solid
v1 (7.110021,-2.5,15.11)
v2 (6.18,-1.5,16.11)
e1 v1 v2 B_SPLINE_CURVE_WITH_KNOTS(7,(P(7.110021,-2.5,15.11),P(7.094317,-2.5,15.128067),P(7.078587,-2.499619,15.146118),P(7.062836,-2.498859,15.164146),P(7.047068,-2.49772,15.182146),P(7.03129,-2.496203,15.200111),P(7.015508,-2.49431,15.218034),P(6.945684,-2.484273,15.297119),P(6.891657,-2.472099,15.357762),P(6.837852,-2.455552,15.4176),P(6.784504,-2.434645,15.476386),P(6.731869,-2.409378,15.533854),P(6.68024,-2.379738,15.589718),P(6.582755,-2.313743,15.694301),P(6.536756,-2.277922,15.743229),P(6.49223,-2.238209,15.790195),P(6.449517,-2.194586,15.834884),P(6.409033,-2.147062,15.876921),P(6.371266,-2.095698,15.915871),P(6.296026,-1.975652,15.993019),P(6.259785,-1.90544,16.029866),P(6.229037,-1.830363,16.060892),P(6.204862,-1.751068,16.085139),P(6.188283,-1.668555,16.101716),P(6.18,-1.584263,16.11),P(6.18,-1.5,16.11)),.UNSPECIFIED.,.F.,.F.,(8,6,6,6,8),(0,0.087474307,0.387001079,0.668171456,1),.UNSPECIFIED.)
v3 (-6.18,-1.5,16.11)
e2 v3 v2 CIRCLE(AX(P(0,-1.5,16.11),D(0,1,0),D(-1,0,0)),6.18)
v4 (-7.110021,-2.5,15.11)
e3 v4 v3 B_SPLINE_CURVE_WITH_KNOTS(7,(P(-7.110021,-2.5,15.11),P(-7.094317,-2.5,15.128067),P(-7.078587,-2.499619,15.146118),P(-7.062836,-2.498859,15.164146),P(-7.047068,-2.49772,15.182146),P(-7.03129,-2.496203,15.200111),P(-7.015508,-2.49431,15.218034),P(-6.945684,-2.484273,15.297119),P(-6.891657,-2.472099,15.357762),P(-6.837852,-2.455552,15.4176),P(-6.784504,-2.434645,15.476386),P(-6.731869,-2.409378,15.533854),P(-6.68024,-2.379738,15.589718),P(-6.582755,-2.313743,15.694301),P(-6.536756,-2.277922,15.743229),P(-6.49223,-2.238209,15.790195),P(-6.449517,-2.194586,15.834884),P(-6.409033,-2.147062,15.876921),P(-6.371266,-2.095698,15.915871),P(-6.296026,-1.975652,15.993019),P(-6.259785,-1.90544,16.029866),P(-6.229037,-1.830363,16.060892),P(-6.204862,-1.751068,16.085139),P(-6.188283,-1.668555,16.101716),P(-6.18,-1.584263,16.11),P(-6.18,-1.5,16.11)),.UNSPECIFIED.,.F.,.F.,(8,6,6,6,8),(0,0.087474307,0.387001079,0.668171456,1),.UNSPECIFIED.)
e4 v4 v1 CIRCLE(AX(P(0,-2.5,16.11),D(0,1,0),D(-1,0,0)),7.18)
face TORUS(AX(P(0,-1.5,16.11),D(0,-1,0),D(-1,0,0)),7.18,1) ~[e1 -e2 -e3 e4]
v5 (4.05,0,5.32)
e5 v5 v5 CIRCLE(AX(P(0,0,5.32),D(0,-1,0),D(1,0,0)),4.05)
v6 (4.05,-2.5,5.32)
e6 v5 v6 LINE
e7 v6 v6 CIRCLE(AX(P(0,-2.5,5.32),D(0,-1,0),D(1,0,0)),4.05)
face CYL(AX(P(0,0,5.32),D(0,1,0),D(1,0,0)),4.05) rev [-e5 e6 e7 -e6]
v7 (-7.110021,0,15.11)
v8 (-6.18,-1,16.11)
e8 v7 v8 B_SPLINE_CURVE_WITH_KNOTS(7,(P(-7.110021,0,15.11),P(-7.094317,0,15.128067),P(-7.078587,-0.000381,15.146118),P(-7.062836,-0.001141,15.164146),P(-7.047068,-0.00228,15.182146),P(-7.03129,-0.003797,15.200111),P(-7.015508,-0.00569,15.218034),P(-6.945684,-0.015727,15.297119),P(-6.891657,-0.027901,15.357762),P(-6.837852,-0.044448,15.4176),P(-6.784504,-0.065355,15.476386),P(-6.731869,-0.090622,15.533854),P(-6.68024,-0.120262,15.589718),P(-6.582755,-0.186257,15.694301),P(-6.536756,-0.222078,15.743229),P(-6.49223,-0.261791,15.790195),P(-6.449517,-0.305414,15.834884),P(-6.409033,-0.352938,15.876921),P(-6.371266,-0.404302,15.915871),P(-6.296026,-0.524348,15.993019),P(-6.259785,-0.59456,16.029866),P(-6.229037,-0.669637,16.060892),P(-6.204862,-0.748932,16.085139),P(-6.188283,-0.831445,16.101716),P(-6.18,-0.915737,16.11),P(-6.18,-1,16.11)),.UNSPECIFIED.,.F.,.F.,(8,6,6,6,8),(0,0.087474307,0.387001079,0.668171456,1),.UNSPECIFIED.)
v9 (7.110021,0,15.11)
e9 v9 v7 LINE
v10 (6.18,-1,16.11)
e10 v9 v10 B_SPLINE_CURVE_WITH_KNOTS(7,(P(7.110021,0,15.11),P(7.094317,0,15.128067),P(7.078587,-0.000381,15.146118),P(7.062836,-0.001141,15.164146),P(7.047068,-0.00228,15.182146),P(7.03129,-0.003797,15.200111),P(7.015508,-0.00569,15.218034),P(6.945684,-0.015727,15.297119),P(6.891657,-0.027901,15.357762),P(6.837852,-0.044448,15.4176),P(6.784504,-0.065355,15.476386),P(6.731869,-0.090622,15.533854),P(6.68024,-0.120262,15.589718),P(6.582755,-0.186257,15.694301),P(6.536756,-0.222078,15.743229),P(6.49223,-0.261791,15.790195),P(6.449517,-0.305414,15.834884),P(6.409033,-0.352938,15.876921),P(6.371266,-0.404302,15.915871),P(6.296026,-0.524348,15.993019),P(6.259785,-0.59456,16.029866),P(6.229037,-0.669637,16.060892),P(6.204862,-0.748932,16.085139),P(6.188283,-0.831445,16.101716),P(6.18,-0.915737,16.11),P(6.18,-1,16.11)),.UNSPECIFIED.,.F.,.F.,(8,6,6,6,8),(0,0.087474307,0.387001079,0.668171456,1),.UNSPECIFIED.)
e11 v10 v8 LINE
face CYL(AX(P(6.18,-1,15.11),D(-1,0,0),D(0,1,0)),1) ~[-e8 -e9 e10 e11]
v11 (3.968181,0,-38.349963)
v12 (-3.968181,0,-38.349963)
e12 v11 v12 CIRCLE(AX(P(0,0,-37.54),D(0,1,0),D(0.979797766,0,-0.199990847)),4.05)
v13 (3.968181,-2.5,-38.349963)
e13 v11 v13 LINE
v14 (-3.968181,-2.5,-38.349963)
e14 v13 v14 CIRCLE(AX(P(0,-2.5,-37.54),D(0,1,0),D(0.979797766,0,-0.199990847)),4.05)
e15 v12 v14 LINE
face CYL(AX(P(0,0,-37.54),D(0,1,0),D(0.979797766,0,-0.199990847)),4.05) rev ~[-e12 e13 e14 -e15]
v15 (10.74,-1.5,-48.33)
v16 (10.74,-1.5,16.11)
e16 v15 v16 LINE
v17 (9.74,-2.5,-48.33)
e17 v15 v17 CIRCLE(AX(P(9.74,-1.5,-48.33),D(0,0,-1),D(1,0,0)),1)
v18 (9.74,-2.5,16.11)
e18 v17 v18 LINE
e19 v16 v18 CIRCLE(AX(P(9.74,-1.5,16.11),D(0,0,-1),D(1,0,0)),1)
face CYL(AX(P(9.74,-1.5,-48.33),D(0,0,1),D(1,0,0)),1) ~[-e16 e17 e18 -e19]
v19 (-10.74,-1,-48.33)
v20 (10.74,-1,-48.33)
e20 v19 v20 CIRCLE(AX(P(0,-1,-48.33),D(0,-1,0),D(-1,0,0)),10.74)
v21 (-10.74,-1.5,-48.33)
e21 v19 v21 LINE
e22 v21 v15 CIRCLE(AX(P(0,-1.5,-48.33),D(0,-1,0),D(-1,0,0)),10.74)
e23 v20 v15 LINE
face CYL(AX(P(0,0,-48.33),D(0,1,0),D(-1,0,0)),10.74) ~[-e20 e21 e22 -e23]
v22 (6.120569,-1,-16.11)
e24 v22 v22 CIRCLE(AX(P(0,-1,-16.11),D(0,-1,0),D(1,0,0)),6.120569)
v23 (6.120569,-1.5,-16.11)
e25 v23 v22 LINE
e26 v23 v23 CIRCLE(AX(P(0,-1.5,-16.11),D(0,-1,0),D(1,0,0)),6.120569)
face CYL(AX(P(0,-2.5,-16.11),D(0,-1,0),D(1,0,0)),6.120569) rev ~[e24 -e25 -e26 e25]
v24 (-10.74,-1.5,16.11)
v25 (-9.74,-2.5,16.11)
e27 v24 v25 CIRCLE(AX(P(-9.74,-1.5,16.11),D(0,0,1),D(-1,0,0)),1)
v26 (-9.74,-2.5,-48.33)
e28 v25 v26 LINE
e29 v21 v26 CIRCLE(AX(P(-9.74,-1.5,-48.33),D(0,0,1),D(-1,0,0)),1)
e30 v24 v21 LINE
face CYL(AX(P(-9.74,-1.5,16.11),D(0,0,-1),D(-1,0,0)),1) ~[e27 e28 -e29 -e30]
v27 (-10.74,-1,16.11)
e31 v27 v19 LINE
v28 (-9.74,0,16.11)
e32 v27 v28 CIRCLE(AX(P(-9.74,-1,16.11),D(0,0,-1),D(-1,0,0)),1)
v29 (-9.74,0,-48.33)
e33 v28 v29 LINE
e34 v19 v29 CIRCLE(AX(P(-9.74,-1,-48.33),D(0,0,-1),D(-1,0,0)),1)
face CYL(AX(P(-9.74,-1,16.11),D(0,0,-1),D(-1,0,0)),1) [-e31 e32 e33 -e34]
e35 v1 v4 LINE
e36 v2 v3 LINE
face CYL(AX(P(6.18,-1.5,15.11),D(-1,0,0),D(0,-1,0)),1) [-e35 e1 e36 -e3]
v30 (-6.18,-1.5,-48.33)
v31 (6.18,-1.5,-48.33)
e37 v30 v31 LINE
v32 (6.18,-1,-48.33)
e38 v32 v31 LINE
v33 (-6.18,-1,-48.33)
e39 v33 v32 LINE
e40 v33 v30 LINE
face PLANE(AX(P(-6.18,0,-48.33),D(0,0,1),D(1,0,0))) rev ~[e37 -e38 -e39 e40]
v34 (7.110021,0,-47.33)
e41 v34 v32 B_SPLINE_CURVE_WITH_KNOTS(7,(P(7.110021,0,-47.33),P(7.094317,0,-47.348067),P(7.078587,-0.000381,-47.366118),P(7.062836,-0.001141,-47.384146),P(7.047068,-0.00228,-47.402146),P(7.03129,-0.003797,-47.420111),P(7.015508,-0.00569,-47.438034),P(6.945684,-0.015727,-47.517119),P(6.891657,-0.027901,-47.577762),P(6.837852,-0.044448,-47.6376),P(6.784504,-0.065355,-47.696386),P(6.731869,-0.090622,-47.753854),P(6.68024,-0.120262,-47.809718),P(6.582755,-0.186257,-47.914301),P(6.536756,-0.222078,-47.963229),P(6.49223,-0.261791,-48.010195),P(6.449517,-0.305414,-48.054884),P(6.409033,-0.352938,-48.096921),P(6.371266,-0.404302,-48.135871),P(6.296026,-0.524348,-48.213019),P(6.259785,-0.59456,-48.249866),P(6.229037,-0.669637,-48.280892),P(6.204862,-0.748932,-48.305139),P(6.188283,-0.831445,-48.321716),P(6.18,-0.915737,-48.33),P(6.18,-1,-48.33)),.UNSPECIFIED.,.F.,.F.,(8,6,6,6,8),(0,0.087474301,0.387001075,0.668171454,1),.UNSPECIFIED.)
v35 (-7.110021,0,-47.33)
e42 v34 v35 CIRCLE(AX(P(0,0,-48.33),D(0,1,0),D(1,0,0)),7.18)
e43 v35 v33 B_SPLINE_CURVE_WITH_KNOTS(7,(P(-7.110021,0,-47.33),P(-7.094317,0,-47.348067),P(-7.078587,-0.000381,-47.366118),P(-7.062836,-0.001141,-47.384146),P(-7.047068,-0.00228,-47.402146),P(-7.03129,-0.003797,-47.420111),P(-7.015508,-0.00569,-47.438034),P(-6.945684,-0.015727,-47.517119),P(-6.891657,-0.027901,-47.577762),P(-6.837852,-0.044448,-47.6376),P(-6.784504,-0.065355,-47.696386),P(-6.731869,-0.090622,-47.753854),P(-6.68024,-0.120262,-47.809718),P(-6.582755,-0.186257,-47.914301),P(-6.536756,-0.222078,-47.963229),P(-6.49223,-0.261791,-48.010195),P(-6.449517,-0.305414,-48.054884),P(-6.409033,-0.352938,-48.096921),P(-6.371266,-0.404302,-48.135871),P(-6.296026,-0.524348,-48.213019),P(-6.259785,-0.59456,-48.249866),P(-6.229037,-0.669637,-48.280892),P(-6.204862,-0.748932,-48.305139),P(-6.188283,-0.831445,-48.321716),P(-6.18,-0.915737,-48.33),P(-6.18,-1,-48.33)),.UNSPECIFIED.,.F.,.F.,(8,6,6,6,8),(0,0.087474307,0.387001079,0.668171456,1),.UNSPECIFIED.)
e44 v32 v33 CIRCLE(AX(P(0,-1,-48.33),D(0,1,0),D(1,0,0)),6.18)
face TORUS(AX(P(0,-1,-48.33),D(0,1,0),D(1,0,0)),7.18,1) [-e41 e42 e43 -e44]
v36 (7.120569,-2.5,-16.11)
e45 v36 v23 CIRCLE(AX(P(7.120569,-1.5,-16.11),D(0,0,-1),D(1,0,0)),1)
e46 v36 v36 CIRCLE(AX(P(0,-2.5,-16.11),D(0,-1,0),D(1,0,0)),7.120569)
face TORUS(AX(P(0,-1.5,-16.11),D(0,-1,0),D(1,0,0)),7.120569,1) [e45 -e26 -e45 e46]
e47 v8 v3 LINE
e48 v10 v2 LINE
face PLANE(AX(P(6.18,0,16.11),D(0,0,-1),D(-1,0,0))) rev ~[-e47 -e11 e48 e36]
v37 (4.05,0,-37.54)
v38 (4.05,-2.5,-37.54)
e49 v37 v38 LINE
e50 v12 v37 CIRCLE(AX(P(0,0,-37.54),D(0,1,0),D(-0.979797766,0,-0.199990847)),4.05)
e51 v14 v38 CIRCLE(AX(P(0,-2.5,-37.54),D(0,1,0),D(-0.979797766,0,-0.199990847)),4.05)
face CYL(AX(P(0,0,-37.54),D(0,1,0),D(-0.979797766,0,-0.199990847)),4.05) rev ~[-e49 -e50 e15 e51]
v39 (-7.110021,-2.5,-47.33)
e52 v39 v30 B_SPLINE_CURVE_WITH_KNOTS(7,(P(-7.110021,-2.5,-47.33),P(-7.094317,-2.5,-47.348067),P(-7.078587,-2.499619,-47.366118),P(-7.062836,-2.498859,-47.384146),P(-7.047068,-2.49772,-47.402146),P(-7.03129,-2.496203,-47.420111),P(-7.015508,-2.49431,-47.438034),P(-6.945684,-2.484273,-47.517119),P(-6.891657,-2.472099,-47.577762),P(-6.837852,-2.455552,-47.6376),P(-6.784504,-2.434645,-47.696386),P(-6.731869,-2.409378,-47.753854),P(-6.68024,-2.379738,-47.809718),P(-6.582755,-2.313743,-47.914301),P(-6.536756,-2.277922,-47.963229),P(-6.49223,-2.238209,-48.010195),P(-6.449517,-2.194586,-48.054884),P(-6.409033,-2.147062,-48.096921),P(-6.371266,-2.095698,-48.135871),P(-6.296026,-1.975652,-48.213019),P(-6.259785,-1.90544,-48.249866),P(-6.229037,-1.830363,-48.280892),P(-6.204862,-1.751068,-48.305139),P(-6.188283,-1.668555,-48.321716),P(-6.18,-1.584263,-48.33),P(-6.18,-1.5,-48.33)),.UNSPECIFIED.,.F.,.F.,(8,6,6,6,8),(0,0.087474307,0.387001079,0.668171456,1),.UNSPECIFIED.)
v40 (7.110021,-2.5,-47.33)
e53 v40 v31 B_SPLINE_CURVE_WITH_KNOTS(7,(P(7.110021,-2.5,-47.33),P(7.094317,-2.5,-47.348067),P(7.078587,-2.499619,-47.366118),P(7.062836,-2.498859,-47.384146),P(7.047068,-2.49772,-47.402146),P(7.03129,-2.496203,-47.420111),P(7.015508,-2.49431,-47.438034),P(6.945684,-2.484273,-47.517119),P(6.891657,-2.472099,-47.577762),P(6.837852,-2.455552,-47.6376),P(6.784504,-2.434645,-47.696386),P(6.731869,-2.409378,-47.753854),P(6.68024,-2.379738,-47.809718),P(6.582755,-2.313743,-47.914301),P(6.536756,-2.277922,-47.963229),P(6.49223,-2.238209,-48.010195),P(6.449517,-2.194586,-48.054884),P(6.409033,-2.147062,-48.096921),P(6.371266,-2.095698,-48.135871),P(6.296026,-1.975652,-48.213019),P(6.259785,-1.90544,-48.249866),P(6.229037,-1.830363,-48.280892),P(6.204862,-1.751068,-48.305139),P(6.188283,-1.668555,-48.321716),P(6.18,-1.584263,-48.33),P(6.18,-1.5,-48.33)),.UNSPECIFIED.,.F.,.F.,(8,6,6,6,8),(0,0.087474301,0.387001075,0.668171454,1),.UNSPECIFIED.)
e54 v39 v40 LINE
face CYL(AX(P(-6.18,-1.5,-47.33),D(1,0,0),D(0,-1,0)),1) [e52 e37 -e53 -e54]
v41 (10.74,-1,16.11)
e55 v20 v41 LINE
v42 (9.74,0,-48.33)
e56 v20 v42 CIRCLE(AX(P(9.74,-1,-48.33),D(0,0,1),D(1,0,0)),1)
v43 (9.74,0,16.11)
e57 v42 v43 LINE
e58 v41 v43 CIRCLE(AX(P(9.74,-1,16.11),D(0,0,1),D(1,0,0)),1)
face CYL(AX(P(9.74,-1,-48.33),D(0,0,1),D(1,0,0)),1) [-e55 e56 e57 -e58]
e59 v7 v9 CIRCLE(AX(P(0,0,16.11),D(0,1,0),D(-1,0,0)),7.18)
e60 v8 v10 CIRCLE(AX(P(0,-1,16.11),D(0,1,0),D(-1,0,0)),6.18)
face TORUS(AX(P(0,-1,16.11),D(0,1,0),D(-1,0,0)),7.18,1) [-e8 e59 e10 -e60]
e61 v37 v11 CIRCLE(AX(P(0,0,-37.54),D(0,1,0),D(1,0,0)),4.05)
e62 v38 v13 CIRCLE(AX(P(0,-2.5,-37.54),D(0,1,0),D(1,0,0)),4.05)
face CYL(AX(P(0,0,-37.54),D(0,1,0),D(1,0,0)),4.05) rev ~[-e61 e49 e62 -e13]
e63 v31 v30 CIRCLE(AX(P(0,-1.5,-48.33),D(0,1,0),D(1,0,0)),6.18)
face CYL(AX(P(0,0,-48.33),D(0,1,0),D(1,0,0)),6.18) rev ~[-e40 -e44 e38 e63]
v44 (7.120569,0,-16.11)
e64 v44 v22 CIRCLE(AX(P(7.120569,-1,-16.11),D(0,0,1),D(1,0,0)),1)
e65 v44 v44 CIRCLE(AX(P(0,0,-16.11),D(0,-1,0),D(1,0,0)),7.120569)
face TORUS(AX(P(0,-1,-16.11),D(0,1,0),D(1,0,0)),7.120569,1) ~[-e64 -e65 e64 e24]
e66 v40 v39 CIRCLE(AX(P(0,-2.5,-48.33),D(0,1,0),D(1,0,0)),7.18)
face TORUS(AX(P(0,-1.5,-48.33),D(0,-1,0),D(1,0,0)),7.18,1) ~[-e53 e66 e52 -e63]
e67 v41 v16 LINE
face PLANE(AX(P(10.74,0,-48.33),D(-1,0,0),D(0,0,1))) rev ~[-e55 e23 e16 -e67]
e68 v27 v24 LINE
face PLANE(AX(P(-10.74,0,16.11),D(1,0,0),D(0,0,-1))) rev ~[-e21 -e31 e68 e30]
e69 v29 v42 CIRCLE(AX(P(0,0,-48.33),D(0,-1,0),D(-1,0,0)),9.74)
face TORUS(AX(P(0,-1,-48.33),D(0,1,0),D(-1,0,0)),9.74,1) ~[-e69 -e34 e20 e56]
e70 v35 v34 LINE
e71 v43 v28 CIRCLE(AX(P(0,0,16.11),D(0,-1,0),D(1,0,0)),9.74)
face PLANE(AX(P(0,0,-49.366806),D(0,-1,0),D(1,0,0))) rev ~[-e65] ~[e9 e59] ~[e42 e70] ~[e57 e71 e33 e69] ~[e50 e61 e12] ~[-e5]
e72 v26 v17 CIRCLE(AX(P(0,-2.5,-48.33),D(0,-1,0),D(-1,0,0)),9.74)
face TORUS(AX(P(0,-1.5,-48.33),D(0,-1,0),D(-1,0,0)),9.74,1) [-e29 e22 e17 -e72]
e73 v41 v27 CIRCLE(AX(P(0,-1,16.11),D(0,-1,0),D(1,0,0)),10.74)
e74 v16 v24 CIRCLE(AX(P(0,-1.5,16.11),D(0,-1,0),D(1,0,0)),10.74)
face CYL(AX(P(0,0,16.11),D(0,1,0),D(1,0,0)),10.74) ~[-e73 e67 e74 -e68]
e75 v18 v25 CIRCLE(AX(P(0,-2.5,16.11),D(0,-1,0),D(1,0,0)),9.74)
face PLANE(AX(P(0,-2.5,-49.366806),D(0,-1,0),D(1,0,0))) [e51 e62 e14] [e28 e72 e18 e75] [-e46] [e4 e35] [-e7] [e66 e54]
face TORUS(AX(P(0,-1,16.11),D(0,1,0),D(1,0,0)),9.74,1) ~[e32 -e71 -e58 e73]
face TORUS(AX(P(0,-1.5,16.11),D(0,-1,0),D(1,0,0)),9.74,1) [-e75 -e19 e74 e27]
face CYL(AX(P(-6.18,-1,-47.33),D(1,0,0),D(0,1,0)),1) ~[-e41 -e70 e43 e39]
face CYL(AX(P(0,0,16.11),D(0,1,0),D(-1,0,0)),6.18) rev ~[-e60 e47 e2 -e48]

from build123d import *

# Parameters (mm, degrees)
F0_W     = 12.36
F0_H     = 4.61
F0_R     = 1
F0_R_2   = 4.05
F1_DEPTH = 2.5
F2_R     = 6.1205689933
F3_DEPTH = 25
F4_R     = 1


# Not quite as in the source:
# - a feature names something its author has since deleted; it is built from what else it names


with BuildPart() as f1:
    # F0 (on Front) → F1 (new body)
    with BuildSketch(Plane.XZ):
        with BuildLine():
            ThreePointArc((10.74, -48.33), (9.5320721777, -43.3815456959), (6.18, -39.5461967235))
            Line((6.18, -39.5461967235), (6.18, -43.72))
            Line((6.18, -43.72), (6.18, -48.33))
            ThreePointArc((6.18, -48.33), (0, -54.51), (-6.18, -48.33))
            Line((-6.18, -48.33), (-6.18, -43.72))
            Line((-6.18, -43.72), (-6.18, -39.5461967235))
            ThreePointArc((-6.18, -39.5461967235), (-9.5320721777, -43.3815456959), (-10.74, -48.33))
            ThreePointArc((-10.74, -48.33), (0, -59.07), (10.74, -48.33))
        make_face()
        with BuildLine():
            Line((6.18, 5.32), (6.18, -11.5))
            Line((6.18, -11.5), (6.18, -16.11))
            Line((6.18, -16.11), (6.18, -20.72))
            Line((6.18, -20.72), (6.18, -37.54))
            Line((6.18, -37.54), (6.18, -39.5461967235))
            ThreePointArc((6.18, -39.5461967235), (9.5320721777, -43.3815456959), (10.74, -48.33))
            Line((10.74, -48.33), (10.74, -18.9998085575))
            Line((10.74, -18.9998085575), (10.74, 16.11))
            ThreePointArc((10.74, 16.11), (0, 26.85), (-10.74, 16.11))
            Line((-10.74, 16.11), (-10.74, -18.9998085575))
            Line((-10.74, -18.9998085575), (-10.74, -48.33))
            ThreePointArc((-10.74, -48.33), (-9.5320721777, -43.3815456959), (-6.18, -39.5461967235))
            Line((-6.18, -39.5461967235), (-6.18, -37.54))
            Line((-6.18, -37.54), (-6.18, -20.72))
            Line((-6.18, -20.72), (-6.18, -16.11))
            Line((-6.18, -16.11), (-6.18, -11.5))
            Line((-6.18, -11.5), (-6.18, 5.32))
            Line((-6.18, 5.32), (-6.18, 11.5))
            Line((-6.18, 11.5), (-6.18, 16.11))
            ThreePointArc((-6.18, 16.11), (0, 22.29), (6.18, 16.11))
            Line((6.18, 16.11), (6.18, 11.5))
            Line((6.18, 11.5), (6.18, 5.32))
        make_face()
        with Locations((0, -13.805)):
            Rectangle(F0_W, F0_H)
        with Locations((0, -13.805)):
            Circle(F0_R, mode=Mode.SUBTRACT)
        with BuildLine():
            Line((-6.18, -11.5), (6.18, -11.5))
            Line((6.18, -11.5), (6.18, 5.32))
            ThreePointArc((6.18, 5.32), (0, -0.86), (-6.18, 5.32))
            Line((-6.18, 5.32), (-6.18, -11.5))
        make_face()
        with BuildLine():
            Line((6.18, -39.5461967235), (6.18, -37.54))
            ThreePointArc((6.18, -37.54), (6.1111223941, -38.4600994968), (5.9060248919, -39.3596895273))
            ThreePointArc((5.9060248919, -39.3596895273), (6.0437319312, -39.451886217), (6.18, -39.5461967235))
        make_face()
        with BuildLine():
            Line((6.18, -37.54), (6.18, -20.72))
            Line((6.18, -20.72), (-6.18, -20.72))
            Line((-6.18, -20.72), (-6.18, -37.54))
            ThreePointArc((-6.18, -37.54), (0, -31.36), (6.18, -37.54))
        make_face()
        with Locations((0, -23.415)):
            Circle(F0_R, mode=Mode.SUBTRACT)
        with BuildLine():
            Line((6.18, -43.72), (6.18, -39.5461967235))
            ThreePointArc((6.18, -39.5461967235), (6.0437319312, -39.451886217), (5.9060248919, -39.3596895273))
            ThreePointArc((5.9060248919, -39.3596895273), (4.8051050355, -41.4263048771), (3.0143614581, -42.935))
            ThreePointArc((3.0143614581, -42.935), (3.5866515341, -43.2972740217), (4.11585957, -43.72))
            Line((4.11585957, -43.72), (6.18, -43.72))
        make_face()
        with BuildLine():
            ThreePointArc((4.11585957, -43.72), (3.5866515341, -43.2972740217), (3.0143614581, -42.935))
            ThreePointArc((3.0143614581, -42.935), (1.5574498387, -43.5205309129), (0, -43.72))
            Line((0, -43.72), (4.11585957, -43.72))
        make_face()
        with BuildLine():
            Line((-6.18, -48.33), (6.18, -48.33))
            ThreePointArc((6.18, -48.33), (5.6404083249, -45.8044913525), (4.11585957, -43.72))
            Line((4.11585957, -43.72), (0, -43.72))
            Line((0, -43.72), (-4.11585957, -43.72))
            ThreePointArc((-4.11585957, -43.72), (-5.6404083249, -45.8044913525), (-6.18, -48.33))
        make_face()
        with Locations((0, -46.025)):
            Circle(F0_R, mode=Mode.SUBTRACT)
        with BuildLine():
            Line((-4.11585957, -43.72), (-6.18, -43.72))
            Line((-6.18, -43.72), (-6.18, -48.33))
            ThreePointArc((-6.18, -48.33), (-5.6404083249, -45.8044913525), (-4.11585957, -43.72))
        make_face()
        with BuildLine():
            Line((6.18, -48.33), (6.18, -43.72))
            Line((6.18, -43.72), (4.11585957, -43.72))
            ThreePointArc((4.11585957, -43.72), (5.6404083249, -45.8044913525), (6.18, -48.33))
        make_face()
        with Locations((0, -18.415)):
            Rectangle(F0_W, F0_H)
        with Locations((0, -46.025)):
            Circle(F0_R)
        with BuildLine():
            ThreePointArc((-5.9060248919, -39.3596895273), (-6.0437319312, -39.451886217), (-6.18, -39.5461967235))
            Line((-6.18, -39.5461967235), (-6.18, -43.72))
            Line((-6.18, -43.72), (-4.11585957, -43.72))
            ThreePointArc((-4.11585957, -43.72), (-3.5866515341, -43.2972740217), (-3.0143614581, -42.935))
            ThreePointArc((-3.0143614581, -42.935), (-4.8051050355, -41.4263048771), (-5.9060248919, -39.3596895273))
        make_face()
        with BuildLine():
            ThreePointArc((0, -43.72), (-1.5574498387, -43.5205309129), (-3.0143614581, -42.935))
            ThreePointArc((-3.0143614581, -42.935), (-3.5866515341, -43.2972740217), (-4.11585957, -43.72))
            Line((-4.11585957, -43.72), (0, -43.72))
        make_face()
        with BuildLine():
            ThreePointArc((5.9060248919, -39.3596895273), (6.1111223941, -38.4600994968), (6.18, -37.54))
            ThreePointArc((6.18, -37.54), (0, -31.36), (-6.18, -37.54))
            ThreePointArc((-6.18, -37.54), (-6.1111223941, -38.4600994968), (-5.9060248919, -39.3596895273))
            ThreePointArc((-5.9060248919, -39.3596895273), (-4.9628492023, -38.8054145604), (-3.9681809503, -38.3499629286))
            ThreePointArc((-3.9681809503, -38.3499629286), (-0.407042474, -33.510506679), (4.05, -37.54))
            ThreePointArc((4.05, -37.54), (4.029493321, -37.947042474), (3.9681809503, -38.3499629286))
            ThreePointArc((3.9681809503, -38.3499629286), (4.9628492023, -38.8054145604), (5.9060248919, -39.3596895273))
        make_face()
        with BuildLine():
            ThreePointArc((3.0143614581, -42.935), (4.8051050355, -41.4263048771), (5.9060248919, -39.3596895273))
            ThreePointArc((5.9060248919, -39.3596895273), (4.9628492023, -38.8054145604), (3.9681809503, -38.3499629286))
            ThreePointArc((3.9681809503, -38.3499629286), (0, -41.59), (-3.9681809503, -38.3499629286))
            ThreePointArc((-3.9681809503, -38.3499629286), (-4.9628492023, -38.8054145604), (-5.9060248919, -39.3596895273))
            ThreePointArc((-5.9060248919, -39.3596895273), (-4.8051050355, -41.4263048771), (-3.0143614581, -42.935))
            ThreePointArc((-3.0143614581, -42.935), (0, -42.15), (3.0143614581, -42.935))
        make_face()
        with BuildLine():
            ThreePointArc((0, -43.72), (1.5574498387, -43.5205309129), (3.0143614581, -42.935))
            ThreePointArc((3.0143614581, -42.935), (0, -42.15), (-3.0143614581, -42.935))
            ThreePointArc((-3.0143614581, -42.935), (-1.5574498387, -43.5205309129), (0, -43.72))
        make_face()
        with BuildLine():
            ThreePointArc((-5.9060248919, -39.3596895273), (-6.1111223941, -38.4600994968), (-6.18, -37.54))
            Line((-6.18, -37.54), (-6.18, -39.5461967235))
            ThreePointArc((-6.18, -39.5461967235), (-6.0437319312, -39.451886217), (-5.9060248919, -39.3596895273))
        make_face()
        with BuildLine():
            ThreePointArc((-6.18, 5.32), (0, -0.86), (6.18, 5.32))
            ThreePointArc((6.18, 5.32), (4.3699199077, 9.6899199077), (0, 11.5))
            ThreePointArc((0, 11.5), (-4.3699199077, 9.6899199077), (-6.18, 5.32))
        make_face()
        with Locations((0, 5.32)):
            Circle(F0_R_2, mode=Mode.SUBTRACT)
        with BuildLine():
            Line((-6.18, 11.5), (-6.18, 5.32))
            ThreePointArc((-6.18, 5.32), (-4.3699199077, 9.6899199077), (0, 11.5))
            Line((0, 11.5), (-6.18, 11.5))
        make_face()
        Polygon((0, 11.5), (6.18, 11.5), (6.18, 16.11), (-6.18, 16.11), (-6.18, 11.5), align=None)
        with Locations((0, 13.805)):
            Circle(F0_R, mode=Mode.SUBTRACT)
        with BuildLine():
            ThreePointArc((0, 11.5), (4.3699199077, 9.6899199077), (6.18, 5.32))
            Line((6.18, 5.32), (6.18, 11.5))
            Line((6.18, 11.5), (0, 11.5))
        make_face()
        with Locations((0, 13.805)):
            Circle(F0_R)
        with Locations((0, -13.805)):
            Circle(F0_R)
        with Locations((0, -23.415)):
            Circle(F0_R)
    extrude(amount=F1_DEPTH)

    # F2 (on face) → F3 (cut)
    with BuildSketch(Plane.XZ.offset(2.5)):
        with Locations((0, -16.11)):
            Circle(F2_R)
    extrude(amount=-F3_DEPTH, mode=Mode.SUBTRACT)

    # F4
    f4_edges = [f1.edges().sort_by_distance(p)[0] for p in [
        (-10.74, -2.5, -16.11),
        (0, -2.5, -54.51),
        (0, -2.5, -48.33),
        (10.74, 0, -16.11),
        (-6.120569, 0, -16.11),
        (-6.120569, -2.5, -16.11),
        (0, -2.5, 16.11),
        (0, -2.5, 22.29),
        (0, 0, 16.11),
        (0, 0, 22.29),
        (0, 0, -48.33),
        (0, 0, -54.51),
    ]]
    fillet(f4_edges, radius=F4_R)


solid = f1.part
